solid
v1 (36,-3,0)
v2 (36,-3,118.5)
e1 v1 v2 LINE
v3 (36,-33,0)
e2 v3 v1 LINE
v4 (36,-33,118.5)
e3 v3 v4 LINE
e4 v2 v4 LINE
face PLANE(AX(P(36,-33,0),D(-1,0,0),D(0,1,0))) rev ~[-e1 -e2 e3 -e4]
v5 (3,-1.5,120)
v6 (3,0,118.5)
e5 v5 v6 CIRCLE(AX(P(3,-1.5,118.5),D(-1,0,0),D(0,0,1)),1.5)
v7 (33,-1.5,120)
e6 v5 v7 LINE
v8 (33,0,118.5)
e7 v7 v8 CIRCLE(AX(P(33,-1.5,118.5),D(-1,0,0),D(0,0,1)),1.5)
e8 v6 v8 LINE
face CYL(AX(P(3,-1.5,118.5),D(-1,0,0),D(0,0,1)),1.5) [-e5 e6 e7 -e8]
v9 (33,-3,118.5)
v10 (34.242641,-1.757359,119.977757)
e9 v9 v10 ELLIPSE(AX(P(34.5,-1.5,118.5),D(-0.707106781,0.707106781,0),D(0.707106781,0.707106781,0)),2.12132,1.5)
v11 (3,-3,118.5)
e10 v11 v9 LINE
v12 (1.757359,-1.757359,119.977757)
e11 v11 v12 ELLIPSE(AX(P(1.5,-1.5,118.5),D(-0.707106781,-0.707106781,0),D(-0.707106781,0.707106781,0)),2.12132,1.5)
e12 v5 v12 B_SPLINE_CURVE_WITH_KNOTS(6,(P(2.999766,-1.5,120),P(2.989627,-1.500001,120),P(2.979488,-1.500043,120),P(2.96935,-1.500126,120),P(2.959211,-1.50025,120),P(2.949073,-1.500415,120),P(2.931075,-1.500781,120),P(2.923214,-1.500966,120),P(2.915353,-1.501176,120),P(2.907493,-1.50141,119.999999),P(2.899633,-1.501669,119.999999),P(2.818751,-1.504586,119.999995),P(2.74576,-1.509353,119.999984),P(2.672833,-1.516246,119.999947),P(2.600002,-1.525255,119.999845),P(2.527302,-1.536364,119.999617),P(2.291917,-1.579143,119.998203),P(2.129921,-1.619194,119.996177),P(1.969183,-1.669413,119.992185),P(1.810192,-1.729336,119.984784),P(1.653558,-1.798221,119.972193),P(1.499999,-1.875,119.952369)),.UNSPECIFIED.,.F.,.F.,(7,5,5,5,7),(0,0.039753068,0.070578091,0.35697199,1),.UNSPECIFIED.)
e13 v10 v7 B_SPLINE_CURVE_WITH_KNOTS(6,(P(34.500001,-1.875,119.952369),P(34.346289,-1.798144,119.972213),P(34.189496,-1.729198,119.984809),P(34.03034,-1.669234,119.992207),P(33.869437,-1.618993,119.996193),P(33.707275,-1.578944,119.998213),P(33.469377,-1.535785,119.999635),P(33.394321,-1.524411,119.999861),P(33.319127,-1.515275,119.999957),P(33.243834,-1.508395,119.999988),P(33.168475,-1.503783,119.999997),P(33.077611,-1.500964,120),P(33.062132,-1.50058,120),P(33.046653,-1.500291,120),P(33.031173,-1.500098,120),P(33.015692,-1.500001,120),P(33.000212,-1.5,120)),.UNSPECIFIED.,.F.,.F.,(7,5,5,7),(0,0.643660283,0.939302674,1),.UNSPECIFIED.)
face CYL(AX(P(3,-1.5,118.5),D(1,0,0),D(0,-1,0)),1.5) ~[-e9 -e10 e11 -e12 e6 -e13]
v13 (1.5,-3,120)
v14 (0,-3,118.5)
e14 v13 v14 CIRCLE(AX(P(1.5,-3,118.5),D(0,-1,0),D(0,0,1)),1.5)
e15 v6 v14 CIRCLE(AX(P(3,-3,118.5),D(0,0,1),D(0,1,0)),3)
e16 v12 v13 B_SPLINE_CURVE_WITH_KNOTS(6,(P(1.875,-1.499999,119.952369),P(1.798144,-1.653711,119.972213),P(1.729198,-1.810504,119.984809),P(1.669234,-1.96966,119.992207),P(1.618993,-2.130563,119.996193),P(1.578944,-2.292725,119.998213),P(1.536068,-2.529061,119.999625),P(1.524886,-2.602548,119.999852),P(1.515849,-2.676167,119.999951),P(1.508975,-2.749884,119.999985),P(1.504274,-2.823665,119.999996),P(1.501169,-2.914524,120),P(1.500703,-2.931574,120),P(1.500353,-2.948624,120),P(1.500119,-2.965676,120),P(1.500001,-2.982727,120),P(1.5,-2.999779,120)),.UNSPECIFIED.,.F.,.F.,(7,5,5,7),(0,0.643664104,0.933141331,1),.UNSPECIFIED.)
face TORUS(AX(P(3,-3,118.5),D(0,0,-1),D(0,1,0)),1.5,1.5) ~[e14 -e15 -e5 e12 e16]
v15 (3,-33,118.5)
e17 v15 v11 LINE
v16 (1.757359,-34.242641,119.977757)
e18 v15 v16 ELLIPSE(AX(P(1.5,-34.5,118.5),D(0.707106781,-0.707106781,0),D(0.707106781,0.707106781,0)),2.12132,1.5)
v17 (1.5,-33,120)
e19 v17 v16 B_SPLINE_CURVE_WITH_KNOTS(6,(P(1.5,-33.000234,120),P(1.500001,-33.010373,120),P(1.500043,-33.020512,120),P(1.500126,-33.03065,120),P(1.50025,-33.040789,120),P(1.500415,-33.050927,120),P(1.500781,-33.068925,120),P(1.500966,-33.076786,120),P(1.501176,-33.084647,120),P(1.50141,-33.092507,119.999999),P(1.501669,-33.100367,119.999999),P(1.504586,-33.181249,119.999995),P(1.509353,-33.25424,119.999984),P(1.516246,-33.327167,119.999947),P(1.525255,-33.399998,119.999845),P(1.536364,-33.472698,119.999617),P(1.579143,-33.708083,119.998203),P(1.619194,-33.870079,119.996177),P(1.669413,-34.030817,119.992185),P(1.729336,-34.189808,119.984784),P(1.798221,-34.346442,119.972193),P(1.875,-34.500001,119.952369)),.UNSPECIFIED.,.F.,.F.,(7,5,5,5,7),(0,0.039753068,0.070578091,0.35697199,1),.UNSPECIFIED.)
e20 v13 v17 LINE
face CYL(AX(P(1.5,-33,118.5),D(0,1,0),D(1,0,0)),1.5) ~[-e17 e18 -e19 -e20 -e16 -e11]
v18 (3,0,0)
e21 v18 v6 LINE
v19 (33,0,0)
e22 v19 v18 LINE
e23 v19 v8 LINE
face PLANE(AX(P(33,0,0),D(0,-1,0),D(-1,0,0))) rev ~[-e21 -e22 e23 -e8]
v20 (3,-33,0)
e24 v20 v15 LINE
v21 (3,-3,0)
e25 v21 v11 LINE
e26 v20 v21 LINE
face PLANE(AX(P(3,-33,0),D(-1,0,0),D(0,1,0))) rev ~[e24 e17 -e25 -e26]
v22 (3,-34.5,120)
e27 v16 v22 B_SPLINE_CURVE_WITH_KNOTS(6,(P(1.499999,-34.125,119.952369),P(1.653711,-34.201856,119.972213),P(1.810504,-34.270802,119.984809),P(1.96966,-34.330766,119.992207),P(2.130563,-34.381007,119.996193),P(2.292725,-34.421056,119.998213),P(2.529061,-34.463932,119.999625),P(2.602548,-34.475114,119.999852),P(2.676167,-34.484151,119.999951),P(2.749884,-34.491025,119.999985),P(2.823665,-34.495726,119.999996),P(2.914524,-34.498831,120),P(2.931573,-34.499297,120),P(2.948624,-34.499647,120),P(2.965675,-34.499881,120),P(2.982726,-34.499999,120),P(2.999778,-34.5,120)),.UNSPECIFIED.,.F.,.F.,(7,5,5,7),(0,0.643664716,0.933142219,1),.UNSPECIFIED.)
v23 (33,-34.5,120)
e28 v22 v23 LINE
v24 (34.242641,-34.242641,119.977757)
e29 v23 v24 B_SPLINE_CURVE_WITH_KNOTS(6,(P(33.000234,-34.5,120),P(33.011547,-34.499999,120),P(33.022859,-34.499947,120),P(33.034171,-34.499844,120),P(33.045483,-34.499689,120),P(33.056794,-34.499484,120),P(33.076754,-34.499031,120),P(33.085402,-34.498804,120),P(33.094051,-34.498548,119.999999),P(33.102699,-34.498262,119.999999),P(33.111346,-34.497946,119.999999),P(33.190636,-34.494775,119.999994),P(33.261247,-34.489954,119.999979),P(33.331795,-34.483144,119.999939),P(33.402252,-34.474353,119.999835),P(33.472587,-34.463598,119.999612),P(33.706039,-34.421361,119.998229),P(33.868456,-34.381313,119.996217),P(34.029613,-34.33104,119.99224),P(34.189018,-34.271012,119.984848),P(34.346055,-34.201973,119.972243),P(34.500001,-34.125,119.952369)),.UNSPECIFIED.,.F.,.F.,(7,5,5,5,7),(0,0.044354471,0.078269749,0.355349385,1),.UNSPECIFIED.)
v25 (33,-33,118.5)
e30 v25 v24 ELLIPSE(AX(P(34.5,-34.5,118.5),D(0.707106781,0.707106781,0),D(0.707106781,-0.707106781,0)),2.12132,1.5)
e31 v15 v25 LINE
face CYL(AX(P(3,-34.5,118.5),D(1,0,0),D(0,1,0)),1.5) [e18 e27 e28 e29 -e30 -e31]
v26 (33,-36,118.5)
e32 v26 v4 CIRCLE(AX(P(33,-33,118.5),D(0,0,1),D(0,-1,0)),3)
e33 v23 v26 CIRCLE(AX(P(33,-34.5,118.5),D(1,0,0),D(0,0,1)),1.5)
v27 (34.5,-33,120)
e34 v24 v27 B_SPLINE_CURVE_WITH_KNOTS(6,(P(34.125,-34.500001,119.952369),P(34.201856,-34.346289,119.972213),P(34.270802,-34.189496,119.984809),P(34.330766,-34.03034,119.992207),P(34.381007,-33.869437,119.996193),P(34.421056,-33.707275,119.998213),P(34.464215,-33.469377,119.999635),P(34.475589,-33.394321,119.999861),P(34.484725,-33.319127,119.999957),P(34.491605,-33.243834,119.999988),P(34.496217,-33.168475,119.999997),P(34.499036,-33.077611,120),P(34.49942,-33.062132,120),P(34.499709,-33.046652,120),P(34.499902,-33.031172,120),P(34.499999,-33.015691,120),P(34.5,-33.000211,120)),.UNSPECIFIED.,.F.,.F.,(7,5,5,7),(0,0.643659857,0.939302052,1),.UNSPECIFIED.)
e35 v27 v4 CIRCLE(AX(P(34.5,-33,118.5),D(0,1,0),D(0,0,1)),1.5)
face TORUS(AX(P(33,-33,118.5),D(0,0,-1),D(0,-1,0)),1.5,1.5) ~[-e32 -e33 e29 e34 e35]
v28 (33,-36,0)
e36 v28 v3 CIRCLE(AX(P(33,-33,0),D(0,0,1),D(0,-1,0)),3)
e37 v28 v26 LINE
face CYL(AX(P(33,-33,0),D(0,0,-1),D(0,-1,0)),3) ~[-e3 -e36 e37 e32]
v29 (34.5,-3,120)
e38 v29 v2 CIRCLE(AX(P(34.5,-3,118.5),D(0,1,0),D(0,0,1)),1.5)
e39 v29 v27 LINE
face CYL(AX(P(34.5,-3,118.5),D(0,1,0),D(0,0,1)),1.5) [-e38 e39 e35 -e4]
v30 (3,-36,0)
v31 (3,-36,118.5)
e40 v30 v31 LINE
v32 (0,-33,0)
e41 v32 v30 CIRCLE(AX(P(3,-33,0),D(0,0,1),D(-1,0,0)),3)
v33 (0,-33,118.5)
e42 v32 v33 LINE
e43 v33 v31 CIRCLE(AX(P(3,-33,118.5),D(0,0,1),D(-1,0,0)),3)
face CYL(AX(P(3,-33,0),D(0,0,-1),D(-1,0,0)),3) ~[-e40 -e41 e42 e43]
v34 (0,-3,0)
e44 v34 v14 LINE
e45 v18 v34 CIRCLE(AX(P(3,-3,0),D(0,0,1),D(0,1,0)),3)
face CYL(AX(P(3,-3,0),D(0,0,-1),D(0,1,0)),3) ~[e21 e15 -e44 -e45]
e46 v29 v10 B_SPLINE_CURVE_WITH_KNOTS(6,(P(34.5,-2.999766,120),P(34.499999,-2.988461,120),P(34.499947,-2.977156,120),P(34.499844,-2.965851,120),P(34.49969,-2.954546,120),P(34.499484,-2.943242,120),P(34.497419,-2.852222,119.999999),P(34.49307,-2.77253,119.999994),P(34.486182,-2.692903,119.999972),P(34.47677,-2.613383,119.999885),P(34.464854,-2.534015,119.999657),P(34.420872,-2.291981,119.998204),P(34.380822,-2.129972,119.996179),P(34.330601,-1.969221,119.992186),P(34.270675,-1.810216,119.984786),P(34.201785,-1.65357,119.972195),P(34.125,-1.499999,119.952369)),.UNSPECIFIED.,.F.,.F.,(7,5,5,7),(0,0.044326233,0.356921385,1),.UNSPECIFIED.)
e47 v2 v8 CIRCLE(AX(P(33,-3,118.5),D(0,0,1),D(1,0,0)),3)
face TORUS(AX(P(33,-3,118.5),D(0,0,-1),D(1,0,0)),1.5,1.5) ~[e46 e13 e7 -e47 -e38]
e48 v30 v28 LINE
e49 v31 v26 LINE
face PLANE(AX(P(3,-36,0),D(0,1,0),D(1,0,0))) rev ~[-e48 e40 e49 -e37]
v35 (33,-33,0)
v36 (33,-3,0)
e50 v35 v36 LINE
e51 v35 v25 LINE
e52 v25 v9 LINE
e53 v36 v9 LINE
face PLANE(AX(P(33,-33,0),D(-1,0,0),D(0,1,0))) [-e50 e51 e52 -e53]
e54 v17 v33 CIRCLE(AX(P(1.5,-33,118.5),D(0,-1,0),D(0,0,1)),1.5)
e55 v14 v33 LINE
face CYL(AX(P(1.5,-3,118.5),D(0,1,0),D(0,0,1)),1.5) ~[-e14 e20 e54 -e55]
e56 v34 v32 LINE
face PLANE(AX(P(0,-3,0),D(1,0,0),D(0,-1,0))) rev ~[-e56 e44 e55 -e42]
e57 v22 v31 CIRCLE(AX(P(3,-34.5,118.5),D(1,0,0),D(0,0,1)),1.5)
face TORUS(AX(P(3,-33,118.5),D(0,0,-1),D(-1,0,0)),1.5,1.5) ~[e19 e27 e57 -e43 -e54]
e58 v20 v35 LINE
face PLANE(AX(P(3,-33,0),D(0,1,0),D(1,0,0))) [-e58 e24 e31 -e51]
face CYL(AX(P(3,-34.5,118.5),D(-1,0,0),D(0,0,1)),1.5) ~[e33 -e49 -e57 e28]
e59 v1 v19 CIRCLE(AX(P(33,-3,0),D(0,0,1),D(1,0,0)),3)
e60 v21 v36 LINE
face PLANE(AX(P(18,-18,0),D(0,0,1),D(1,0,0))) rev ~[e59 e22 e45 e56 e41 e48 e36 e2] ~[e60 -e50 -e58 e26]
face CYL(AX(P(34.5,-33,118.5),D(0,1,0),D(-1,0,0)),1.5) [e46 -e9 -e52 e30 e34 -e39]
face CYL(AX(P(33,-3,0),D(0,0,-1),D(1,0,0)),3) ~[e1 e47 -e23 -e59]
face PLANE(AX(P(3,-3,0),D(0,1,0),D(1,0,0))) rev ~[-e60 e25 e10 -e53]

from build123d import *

# Parameters (mm, degrees)
F0_W         = 30
F0_H         = 30
F1_DEPTH     = 120
F2_R         = 1.5
F3_T1_DEPTH  = 30
F3_T3_DEPTH  = 30
F3_T6_ANGLE  = 90
F3_T8_ANGLE  = 90
F3_T10_ANGLE = 90
F3_T12_ANGLE = 90


# Not quite as in the source:
# - a fillet or chamfer that OpenCascade refuses, or shapes differently, is made with other operations: its cross-section is extruded or revolved along the edge and cut away or added


with BuildPart() as f1:
    # F0 (on Top) → F1 (new body)
    with BuildSketch(Plane.XY):
        with BuildLine():
            Line((33, 0), (3, 0))
            ThreePointArc((3, 0), (0.8786796564, -0.8786796564), (0, -3))
            Line((0, -3), (0, -33))
            ThreePointArc((0, -33), (0.8786796564, -35.1213203436), (3, -36))
            Line((3, -36), (33, -36))
            ThreePointArc((33, -36), (35.1213203436, -35.1213203436), (36, -33))
            Line((36, -33), (36, -3))
            ThreePointArc((36, -3), (35.1213203436, -0.8786796564), (33, 0))
        make_face()
        with Locations((18, -18)):
            Rectangle(F0_W, F0_H, mode=Mode.SUBTRACT)
    extrude(amount=F1_DEPTH)

    # F2
    f2_edges = [f1.edges().sort_by_distance(p)[0] for p in [
        (18, -33, 120),
        (3, -18, 120),
        (18, -3, 120),
        (33, -18, 120),
    ]]
    fillet(f2_edges, radius=F2_R)

    # F3: fillet of radius 1.5 on 4 edges, made by hand

    # F3_s2 → F3_t1 (cut)
    with BuildSketch(Plane.XZ.offset(3)):
        with BuildLine():
            ThreePointArc((34.5, 120), (35.5606601718, 119.5606601718), (36, 118.5))
            Line((36, 118.5), (36, 120))
            Line((36, 120), (34.5, 120))
        make_face()
        with BuildLine():
            ThreePointArc((1.5, 120), (0.4393398282, 119.5606601718), (0, 118.5))
            Line((0, 118.5), (0, 120))
            Line((0, 120), (1.5, 120))
        make_face()
    extrude(amount=F3_T1_DEPTH, mode=Mode.SUBTRACT)

    # F3_s4 → F3_t3 (cut)
    with BuildSketch(Plane.YZ.offset(3)):
        with BuildLine():
            ThreePointArc((-1.5, 120), (-0.4393398282, 119.5606601718), (0, 118.5))
            Line((0, 118.5), (0, 120))
            Line((0, 120), (-1.5, 120))
        make_face()
        with BuildLine():
            ThreePointArc((-34.5, 120), (-35.5606601718, 119.5606601718), (-36, 118.5))
            Line((-36, 118.5), (-36, 120))
            Line((-36, 120), (-34.5, 120))
        make_face()
    extrude(amount=F3_T3_DEPTH, mode=Mode.SUBTRACT)

    # F3_s5 → F3_t6 (revolve, cut)
    with BuildSketch(Plane.XZ.offset(3)):
        with BuildLine():
            ThreePointArc((34.5, 120), (35.5606601718, 119.5606601718), (36, 118.5))
            Line((36, 118.5), (36, 120))
            Line((36, 120), (34.5, 120))
        make_face()
    revolve(axis=Axis((33, -3, 120), (0, 0, 1)), revolution_arc=F3_T6_ANGLE, mode=Mode.SUBTRACT)

    # F3_s7 → F3_t8 (revolve, cut)
    with BuildSketch(Plane.YZ.offset(3)):
        with BuildLine():
            ThreePointArc((-1.5, 120), (-0.4393398282, 119.5606601718), (0, 118.5))
            Line((0, 118.5), (0, 120))
            Line((0, 120), (-1.5, 120))
        make_face()
    revolve(axis=Axis((3, -3, 120), (0, 0, 1)), revolution_arc=F3_T8_ANGLE, mode=Mode.SUBTRACT)

    # F3_s9 → F3_t10 (revolve, cut)
    with BuildSketch(Plane.XZ.offset(33)):
        with BuildLine():
            ThreePointArc((1.5, 120), (0.4393398282, 119.5606601718), (0, 118.5))
            Line((0, 118.5), (0, 120))
            Line((0, 120), (1.5, 120))
        make_face()
    revolve(axis=Axis((3, -33, 120), (0, 0, 1)), revolution_arc=F3_T10_ANGLE, mode=Mode.SUBTRACT)

    # F3_s11 → F3_t12 (revolve, cut)
    with BuildSketch(Plane.YZ.offset(33)):
        with BuildLine():
            ThreePointArc((-34.5, 120), (-35.5606601718, 119.5606601718), (-36, 118.5))
            Line((-36, 118.5), (-36, 120))
            Line((-36, 120), (-34.5, 120))
        make_face()
    revolve(axis=Axis((33, -33, 120), (0, 0, 1)), revolution_arc=F3_T12_ANGLE, mode=Mode.SUBTRACT)


solid = f1.part
